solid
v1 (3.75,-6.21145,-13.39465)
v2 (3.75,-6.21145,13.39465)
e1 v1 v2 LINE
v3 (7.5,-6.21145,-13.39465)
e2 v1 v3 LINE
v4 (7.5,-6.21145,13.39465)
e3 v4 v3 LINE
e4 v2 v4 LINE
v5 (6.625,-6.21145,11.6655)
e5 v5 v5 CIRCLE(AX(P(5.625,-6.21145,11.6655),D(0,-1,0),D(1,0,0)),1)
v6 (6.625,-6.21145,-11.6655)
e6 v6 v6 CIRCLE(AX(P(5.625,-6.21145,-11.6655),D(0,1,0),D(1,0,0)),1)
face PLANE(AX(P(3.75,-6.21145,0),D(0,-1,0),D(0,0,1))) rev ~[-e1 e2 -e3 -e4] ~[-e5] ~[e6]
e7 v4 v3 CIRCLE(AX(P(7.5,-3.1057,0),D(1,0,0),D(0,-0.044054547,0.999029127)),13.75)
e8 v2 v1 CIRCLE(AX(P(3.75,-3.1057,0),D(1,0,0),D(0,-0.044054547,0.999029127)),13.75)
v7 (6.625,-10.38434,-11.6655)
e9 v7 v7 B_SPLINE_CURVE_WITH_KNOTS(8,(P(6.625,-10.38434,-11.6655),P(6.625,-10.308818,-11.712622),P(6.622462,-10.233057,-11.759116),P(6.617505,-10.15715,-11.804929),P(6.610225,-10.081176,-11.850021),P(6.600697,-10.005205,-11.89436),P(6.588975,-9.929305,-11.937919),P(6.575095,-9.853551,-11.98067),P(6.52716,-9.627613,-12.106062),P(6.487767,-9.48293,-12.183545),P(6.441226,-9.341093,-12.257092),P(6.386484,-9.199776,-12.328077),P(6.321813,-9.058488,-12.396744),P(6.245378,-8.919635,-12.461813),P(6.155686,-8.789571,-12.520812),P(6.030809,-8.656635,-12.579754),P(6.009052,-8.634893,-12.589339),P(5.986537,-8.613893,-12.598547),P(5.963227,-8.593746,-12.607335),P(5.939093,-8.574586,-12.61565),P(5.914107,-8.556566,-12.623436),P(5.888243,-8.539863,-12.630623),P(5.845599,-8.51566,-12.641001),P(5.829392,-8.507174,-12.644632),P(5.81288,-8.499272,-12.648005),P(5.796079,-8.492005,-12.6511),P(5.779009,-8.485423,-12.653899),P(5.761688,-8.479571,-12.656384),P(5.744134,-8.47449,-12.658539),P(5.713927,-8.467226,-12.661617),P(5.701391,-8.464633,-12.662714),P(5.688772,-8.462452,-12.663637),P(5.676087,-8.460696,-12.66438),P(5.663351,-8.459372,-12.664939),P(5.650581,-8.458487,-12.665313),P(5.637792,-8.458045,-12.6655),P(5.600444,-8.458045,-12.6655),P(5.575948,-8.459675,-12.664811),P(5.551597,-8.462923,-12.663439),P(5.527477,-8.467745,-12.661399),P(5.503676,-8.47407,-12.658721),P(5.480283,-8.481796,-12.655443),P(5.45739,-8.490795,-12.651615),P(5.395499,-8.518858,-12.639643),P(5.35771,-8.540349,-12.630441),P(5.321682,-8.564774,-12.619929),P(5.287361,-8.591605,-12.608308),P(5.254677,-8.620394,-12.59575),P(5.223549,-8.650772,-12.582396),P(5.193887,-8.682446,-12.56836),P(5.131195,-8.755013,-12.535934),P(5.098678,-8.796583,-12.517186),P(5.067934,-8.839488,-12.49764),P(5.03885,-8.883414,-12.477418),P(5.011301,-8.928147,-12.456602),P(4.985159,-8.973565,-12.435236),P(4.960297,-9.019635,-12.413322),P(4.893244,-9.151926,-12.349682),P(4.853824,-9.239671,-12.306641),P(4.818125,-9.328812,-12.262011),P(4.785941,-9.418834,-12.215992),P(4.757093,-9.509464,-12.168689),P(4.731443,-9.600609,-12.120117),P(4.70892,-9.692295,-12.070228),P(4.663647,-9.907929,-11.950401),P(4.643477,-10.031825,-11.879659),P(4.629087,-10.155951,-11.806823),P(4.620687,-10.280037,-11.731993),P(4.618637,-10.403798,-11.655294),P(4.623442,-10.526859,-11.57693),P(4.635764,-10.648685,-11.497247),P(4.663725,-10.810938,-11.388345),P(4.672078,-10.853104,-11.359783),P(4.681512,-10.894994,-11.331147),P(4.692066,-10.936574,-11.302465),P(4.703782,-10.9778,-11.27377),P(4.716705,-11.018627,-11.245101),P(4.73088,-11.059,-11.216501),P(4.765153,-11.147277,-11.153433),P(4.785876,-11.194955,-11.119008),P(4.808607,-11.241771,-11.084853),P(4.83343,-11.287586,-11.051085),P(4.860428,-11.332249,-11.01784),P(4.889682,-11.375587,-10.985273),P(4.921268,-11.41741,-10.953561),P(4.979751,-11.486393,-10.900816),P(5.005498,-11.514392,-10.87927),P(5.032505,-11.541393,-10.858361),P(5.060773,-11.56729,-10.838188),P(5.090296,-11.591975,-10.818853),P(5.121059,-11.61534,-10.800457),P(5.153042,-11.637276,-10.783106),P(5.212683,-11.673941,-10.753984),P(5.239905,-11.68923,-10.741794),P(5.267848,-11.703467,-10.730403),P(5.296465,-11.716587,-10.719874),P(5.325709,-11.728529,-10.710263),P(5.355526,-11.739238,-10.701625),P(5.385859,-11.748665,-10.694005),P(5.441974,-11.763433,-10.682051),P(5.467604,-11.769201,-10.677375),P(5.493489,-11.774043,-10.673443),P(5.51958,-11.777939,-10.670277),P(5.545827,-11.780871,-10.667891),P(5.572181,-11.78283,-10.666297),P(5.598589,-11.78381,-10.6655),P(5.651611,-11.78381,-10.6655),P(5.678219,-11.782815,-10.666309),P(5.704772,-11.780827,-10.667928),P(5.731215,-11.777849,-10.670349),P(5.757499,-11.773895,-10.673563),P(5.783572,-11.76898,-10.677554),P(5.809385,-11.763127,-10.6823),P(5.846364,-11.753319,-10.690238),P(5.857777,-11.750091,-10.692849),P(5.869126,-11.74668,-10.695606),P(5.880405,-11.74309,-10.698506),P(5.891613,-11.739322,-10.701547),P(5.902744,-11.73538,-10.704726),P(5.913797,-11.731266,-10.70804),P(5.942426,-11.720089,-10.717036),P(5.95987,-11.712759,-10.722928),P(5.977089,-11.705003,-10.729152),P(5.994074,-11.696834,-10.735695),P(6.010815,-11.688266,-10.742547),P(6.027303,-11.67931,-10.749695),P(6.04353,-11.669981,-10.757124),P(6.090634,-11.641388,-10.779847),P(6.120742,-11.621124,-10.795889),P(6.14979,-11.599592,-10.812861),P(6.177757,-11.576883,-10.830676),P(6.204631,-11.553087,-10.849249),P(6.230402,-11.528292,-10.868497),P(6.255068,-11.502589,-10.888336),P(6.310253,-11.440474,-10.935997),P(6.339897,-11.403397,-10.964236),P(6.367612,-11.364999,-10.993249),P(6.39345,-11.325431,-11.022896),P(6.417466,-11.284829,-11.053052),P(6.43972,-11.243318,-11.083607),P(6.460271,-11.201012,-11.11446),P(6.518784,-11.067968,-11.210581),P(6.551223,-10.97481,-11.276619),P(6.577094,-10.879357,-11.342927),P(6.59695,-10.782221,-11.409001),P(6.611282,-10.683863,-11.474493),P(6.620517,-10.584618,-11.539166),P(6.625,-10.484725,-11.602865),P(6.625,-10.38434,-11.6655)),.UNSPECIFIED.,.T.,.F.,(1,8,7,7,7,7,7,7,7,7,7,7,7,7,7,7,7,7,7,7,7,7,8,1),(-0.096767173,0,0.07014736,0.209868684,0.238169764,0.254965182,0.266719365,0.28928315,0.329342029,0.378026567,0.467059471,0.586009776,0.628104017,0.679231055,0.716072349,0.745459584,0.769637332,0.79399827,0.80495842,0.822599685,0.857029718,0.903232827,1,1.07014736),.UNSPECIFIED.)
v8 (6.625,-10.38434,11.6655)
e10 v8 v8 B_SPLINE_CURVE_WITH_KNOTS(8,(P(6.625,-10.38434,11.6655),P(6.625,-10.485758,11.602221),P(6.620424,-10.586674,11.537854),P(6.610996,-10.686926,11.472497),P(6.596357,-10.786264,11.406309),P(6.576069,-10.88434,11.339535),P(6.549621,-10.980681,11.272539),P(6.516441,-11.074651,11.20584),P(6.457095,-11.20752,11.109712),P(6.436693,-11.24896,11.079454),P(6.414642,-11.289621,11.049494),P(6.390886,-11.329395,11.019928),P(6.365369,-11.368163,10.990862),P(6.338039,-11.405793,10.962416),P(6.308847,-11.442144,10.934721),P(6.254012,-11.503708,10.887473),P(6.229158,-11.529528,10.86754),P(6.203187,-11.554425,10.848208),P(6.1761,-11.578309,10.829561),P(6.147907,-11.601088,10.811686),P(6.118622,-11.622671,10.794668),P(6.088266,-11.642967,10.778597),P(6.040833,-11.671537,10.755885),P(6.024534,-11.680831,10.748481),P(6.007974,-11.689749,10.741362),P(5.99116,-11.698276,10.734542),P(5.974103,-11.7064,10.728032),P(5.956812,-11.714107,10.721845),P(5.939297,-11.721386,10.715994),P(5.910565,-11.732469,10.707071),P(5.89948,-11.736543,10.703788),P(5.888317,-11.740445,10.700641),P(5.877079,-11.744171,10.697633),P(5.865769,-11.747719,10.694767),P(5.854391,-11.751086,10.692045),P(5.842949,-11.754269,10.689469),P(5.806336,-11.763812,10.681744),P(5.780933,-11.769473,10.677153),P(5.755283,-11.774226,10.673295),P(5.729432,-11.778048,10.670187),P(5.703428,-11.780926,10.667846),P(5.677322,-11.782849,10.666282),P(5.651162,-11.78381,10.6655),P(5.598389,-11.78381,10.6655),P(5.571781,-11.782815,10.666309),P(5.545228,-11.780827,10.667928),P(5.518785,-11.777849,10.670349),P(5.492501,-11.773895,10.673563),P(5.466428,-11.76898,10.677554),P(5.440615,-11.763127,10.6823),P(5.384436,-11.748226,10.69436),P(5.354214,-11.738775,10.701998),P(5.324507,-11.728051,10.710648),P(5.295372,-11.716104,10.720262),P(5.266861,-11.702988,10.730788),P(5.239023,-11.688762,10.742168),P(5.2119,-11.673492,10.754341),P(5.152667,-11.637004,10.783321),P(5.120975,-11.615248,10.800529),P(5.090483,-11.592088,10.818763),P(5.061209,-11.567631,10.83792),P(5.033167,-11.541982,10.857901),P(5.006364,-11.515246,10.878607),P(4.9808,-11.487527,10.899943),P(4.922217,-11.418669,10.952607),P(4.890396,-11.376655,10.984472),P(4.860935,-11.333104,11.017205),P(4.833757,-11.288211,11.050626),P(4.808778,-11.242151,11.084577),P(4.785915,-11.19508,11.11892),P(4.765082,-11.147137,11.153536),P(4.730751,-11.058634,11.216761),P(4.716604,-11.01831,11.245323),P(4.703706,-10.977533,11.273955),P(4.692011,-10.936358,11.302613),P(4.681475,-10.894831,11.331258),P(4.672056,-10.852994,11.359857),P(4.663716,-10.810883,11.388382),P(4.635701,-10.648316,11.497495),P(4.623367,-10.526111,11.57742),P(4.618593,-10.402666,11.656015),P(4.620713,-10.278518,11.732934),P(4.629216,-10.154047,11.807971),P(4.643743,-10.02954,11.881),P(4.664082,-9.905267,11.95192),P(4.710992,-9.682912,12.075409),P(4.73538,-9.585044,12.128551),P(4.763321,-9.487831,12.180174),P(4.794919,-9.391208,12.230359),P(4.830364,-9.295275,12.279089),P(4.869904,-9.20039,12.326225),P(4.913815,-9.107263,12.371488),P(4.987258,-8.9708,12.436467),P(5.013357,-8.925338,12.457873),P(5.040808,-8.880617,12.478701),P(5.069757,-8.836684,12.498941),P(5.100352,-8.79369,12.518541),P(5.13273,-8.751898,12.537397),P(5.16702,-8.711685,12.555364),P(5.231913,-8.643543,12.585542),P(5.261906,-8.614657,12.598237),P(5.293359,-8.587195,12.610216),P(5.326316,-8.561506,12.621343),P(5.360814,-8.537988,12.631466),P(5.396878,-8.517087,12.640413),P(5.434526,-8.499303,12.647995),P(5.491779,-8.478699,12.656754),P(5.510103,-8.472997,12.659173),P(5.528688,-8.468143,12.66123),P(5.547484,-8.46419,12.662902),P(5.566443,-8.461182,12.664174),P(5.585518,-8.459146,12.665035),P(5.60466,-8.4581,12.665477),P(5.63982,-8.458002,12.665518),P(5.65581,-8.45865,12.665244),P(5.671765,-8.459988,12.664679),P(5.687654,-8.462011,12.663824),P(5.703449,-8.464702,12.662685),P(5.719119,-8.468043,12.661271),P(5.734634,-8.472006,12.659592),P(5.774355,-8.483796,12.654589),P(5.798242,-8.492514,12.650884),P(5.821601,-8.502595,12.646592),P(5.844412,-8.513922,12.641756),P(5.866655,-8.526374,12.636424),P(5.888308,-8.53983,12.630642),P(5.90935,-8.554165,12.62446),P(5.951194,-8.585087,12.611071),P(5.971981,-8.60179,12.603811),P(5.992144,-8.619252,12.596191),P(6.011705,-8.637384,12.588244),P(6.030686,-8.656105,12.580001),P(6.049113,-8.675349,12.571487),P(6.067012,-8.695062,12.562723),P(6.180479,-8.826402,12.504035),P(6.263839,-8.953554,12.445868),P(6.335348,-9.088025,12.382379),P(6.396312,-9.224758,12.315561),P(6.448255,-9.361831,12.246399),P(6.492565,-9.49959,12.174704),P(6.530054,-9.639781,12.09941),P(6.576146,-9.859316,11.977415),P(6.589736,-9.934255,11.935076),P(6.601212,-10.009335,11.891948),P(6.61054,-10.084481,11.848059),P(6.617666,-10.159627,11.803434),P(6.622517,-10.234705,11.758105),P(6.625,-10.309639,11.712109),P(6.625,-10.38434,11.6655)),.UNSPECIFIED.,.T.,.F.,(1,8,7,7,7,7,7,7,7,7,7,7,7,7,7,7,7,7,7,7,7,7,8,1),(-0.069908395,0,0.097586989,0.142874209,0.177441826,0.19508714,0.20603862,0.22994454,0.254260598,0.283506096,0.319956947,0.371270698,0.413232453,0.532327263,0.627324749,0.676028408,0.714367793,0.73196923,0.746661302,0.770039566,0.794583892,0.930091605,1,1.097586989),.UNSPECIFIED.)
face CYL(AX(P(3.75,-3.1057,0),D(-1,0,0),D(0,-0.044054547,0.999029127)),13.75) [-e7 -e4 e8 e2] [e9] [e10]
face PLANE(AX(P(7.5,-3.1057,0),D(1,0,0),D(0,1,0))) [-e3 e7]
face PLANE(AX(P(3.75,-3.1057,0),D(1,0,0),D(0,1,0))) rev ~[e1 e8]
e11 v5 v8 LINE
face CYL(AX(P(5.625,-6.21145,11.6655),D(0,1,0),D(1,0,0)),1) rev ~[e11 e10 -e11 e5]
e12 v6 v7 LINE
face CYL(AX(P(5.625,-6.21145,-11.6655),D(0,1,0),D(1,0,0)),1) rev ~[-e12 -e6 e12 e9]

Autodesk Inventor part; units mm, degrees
ref_plane "YZ Plane" through (0, 0, 0) normal (1, 0, 0) x (0, 1, 0)
ref_plane "XZ Plane" through (0, 0, 0) normal (0, 1, 0) x (-1, 0, 0)
ref_plane "XY Plane" through (0, 0, 0) normal (0, 0, 1) x (1, 0, 0)
sketch "Sketch1" plane through (0, 0, 0) normal (1, 0, 0) x (0, 1, 0)
  arc A0 (-1.2115, 27.4733) -> (-1.2115, -27.4733) centre (0, 0) ccw
  line L0 (-1.2115, -27.4733) -> (-6.2115, -27.4733)
  line L1 (-6.2115, -27.4733) -> (-6.2115, 27.4733)
  line L2 (-6.2115, 27.4733) -> (-1.2115, 27.4733)
  line L3 (-6.2115, -26.7893) -> (-6.2115, 26.7893)
  line L4 (-6.2115, 0) -> (-6.2115, 26.7893)
  circle A1 centre (0, 0) radius 27.5
  point P0 (5.2115, 24.6247)
  dimension "d0" = 5
  dimension "d1" = 53.5786
extrude "Extrusion1" add sketch "Sketch1" along normal blind 7.5 contours L1 A0
sketch "Sketch2" plane through (0, -6.2115, 26.7893) normal (0, 1, 0) x (1, 0, 0)
  line L0 (0, 6.9167) -> (7.5, 6.9167)
  line L1 (0, 0) -> (0, 6.9167)
  line L2 (0, 6.9167) -> (7.5, 6.9167)
  line L3 (7.5, 26.7893) -> (7.5, 0)
  line L4 (7.5, 6.9167) -> (7.5, 0)
  line L5 (7.5, 0) -> (0, 0)
  line L6 (7.5, 0) -> (0, 0)
  circle A0 centre (3.75, 3.4583) radius 1
  line L7 (0, 0) -> (0, 53.5786)
  line L8 (0, 53.5786) -> (0, 0)
  line L9 (0, 26.7893) -> (7.5, 26.7893)
  circle A1 centre (3.75, 50.1203) radius 1
  circle A2 centre (3.75, 3.4583) radius 2
  circle A3 centre (3.75, 50.1203) radius 2
  line L10 (0, 6.9167) -> (7.5, 6.9167)
  line L11 (0, 0) -> (0, 6.9167)
  line L12 (0, 6.9167) -> (7.5, 6.9167)
  line L13 (7.5, 26.7893) -> (7.5, 0)
  line L14 (7.5, 6.9167) -> (7.5, 0)
  line L15 (7.5, 0) -> (0, 0)
  line L16 (7.5, 0) -> (0, 0)
  line L17 (0, 0) -> (2.2798, 2.1025)
  line L18 (5.2202, 4.8142) -> (7.5, 6.9167)
  line L19 (0, 6.9167) -> (2.2798, 4.8142)
  line L20 (5.2202, 2.1025) -> (7.5, 0)
  line L21 (0, 0) -> (0, 53.5786)
  line L22 (0, 53.5786) -> (0, 0)
  line L23 (0, 26.7893) -> (7.5, 26.7893)
  circle A4 centre (3.75, 50.1203) radius 1
  line L24 (0, 53.5786) -> (7.5, 53.5786)
  line L25 (7.5, 53.5786) -> (7.5, 0)
  circle A5 centre (3.75, 50.1203) radius 2
  circle A6 centre (3.75, 3.4583) radius 2
  point P0 (0, 26.7893)
  point P1 (280.32, 51.414)
  point P2 (4.4851, 4.1363)
  point P3 (4.4851, 2.7804)
  point P4 (3.0149, 4.1363)
  point P5 (3.0149, 2.7804)
  point P6 (280.32, 51.414)
  dimension "d6" = 2
  dimension "d9" = 4
  dimension "d10" = 4
  dimension "d13" = 4
  dimension "d14" = 4
extrude "Extrusion2" cut sketch "Sketch2" against normal blind 10 contours A0 | A1
extrude "Extrusion3" cut sketch "Sketch2" against normal blind 13.175 contours A2 | A3
scale "Scale1" factors (0.5, 0.5, 0.5) then translate (3.75, -3.1057, 0) bodies 1
properties part number "Contrapeso1"
